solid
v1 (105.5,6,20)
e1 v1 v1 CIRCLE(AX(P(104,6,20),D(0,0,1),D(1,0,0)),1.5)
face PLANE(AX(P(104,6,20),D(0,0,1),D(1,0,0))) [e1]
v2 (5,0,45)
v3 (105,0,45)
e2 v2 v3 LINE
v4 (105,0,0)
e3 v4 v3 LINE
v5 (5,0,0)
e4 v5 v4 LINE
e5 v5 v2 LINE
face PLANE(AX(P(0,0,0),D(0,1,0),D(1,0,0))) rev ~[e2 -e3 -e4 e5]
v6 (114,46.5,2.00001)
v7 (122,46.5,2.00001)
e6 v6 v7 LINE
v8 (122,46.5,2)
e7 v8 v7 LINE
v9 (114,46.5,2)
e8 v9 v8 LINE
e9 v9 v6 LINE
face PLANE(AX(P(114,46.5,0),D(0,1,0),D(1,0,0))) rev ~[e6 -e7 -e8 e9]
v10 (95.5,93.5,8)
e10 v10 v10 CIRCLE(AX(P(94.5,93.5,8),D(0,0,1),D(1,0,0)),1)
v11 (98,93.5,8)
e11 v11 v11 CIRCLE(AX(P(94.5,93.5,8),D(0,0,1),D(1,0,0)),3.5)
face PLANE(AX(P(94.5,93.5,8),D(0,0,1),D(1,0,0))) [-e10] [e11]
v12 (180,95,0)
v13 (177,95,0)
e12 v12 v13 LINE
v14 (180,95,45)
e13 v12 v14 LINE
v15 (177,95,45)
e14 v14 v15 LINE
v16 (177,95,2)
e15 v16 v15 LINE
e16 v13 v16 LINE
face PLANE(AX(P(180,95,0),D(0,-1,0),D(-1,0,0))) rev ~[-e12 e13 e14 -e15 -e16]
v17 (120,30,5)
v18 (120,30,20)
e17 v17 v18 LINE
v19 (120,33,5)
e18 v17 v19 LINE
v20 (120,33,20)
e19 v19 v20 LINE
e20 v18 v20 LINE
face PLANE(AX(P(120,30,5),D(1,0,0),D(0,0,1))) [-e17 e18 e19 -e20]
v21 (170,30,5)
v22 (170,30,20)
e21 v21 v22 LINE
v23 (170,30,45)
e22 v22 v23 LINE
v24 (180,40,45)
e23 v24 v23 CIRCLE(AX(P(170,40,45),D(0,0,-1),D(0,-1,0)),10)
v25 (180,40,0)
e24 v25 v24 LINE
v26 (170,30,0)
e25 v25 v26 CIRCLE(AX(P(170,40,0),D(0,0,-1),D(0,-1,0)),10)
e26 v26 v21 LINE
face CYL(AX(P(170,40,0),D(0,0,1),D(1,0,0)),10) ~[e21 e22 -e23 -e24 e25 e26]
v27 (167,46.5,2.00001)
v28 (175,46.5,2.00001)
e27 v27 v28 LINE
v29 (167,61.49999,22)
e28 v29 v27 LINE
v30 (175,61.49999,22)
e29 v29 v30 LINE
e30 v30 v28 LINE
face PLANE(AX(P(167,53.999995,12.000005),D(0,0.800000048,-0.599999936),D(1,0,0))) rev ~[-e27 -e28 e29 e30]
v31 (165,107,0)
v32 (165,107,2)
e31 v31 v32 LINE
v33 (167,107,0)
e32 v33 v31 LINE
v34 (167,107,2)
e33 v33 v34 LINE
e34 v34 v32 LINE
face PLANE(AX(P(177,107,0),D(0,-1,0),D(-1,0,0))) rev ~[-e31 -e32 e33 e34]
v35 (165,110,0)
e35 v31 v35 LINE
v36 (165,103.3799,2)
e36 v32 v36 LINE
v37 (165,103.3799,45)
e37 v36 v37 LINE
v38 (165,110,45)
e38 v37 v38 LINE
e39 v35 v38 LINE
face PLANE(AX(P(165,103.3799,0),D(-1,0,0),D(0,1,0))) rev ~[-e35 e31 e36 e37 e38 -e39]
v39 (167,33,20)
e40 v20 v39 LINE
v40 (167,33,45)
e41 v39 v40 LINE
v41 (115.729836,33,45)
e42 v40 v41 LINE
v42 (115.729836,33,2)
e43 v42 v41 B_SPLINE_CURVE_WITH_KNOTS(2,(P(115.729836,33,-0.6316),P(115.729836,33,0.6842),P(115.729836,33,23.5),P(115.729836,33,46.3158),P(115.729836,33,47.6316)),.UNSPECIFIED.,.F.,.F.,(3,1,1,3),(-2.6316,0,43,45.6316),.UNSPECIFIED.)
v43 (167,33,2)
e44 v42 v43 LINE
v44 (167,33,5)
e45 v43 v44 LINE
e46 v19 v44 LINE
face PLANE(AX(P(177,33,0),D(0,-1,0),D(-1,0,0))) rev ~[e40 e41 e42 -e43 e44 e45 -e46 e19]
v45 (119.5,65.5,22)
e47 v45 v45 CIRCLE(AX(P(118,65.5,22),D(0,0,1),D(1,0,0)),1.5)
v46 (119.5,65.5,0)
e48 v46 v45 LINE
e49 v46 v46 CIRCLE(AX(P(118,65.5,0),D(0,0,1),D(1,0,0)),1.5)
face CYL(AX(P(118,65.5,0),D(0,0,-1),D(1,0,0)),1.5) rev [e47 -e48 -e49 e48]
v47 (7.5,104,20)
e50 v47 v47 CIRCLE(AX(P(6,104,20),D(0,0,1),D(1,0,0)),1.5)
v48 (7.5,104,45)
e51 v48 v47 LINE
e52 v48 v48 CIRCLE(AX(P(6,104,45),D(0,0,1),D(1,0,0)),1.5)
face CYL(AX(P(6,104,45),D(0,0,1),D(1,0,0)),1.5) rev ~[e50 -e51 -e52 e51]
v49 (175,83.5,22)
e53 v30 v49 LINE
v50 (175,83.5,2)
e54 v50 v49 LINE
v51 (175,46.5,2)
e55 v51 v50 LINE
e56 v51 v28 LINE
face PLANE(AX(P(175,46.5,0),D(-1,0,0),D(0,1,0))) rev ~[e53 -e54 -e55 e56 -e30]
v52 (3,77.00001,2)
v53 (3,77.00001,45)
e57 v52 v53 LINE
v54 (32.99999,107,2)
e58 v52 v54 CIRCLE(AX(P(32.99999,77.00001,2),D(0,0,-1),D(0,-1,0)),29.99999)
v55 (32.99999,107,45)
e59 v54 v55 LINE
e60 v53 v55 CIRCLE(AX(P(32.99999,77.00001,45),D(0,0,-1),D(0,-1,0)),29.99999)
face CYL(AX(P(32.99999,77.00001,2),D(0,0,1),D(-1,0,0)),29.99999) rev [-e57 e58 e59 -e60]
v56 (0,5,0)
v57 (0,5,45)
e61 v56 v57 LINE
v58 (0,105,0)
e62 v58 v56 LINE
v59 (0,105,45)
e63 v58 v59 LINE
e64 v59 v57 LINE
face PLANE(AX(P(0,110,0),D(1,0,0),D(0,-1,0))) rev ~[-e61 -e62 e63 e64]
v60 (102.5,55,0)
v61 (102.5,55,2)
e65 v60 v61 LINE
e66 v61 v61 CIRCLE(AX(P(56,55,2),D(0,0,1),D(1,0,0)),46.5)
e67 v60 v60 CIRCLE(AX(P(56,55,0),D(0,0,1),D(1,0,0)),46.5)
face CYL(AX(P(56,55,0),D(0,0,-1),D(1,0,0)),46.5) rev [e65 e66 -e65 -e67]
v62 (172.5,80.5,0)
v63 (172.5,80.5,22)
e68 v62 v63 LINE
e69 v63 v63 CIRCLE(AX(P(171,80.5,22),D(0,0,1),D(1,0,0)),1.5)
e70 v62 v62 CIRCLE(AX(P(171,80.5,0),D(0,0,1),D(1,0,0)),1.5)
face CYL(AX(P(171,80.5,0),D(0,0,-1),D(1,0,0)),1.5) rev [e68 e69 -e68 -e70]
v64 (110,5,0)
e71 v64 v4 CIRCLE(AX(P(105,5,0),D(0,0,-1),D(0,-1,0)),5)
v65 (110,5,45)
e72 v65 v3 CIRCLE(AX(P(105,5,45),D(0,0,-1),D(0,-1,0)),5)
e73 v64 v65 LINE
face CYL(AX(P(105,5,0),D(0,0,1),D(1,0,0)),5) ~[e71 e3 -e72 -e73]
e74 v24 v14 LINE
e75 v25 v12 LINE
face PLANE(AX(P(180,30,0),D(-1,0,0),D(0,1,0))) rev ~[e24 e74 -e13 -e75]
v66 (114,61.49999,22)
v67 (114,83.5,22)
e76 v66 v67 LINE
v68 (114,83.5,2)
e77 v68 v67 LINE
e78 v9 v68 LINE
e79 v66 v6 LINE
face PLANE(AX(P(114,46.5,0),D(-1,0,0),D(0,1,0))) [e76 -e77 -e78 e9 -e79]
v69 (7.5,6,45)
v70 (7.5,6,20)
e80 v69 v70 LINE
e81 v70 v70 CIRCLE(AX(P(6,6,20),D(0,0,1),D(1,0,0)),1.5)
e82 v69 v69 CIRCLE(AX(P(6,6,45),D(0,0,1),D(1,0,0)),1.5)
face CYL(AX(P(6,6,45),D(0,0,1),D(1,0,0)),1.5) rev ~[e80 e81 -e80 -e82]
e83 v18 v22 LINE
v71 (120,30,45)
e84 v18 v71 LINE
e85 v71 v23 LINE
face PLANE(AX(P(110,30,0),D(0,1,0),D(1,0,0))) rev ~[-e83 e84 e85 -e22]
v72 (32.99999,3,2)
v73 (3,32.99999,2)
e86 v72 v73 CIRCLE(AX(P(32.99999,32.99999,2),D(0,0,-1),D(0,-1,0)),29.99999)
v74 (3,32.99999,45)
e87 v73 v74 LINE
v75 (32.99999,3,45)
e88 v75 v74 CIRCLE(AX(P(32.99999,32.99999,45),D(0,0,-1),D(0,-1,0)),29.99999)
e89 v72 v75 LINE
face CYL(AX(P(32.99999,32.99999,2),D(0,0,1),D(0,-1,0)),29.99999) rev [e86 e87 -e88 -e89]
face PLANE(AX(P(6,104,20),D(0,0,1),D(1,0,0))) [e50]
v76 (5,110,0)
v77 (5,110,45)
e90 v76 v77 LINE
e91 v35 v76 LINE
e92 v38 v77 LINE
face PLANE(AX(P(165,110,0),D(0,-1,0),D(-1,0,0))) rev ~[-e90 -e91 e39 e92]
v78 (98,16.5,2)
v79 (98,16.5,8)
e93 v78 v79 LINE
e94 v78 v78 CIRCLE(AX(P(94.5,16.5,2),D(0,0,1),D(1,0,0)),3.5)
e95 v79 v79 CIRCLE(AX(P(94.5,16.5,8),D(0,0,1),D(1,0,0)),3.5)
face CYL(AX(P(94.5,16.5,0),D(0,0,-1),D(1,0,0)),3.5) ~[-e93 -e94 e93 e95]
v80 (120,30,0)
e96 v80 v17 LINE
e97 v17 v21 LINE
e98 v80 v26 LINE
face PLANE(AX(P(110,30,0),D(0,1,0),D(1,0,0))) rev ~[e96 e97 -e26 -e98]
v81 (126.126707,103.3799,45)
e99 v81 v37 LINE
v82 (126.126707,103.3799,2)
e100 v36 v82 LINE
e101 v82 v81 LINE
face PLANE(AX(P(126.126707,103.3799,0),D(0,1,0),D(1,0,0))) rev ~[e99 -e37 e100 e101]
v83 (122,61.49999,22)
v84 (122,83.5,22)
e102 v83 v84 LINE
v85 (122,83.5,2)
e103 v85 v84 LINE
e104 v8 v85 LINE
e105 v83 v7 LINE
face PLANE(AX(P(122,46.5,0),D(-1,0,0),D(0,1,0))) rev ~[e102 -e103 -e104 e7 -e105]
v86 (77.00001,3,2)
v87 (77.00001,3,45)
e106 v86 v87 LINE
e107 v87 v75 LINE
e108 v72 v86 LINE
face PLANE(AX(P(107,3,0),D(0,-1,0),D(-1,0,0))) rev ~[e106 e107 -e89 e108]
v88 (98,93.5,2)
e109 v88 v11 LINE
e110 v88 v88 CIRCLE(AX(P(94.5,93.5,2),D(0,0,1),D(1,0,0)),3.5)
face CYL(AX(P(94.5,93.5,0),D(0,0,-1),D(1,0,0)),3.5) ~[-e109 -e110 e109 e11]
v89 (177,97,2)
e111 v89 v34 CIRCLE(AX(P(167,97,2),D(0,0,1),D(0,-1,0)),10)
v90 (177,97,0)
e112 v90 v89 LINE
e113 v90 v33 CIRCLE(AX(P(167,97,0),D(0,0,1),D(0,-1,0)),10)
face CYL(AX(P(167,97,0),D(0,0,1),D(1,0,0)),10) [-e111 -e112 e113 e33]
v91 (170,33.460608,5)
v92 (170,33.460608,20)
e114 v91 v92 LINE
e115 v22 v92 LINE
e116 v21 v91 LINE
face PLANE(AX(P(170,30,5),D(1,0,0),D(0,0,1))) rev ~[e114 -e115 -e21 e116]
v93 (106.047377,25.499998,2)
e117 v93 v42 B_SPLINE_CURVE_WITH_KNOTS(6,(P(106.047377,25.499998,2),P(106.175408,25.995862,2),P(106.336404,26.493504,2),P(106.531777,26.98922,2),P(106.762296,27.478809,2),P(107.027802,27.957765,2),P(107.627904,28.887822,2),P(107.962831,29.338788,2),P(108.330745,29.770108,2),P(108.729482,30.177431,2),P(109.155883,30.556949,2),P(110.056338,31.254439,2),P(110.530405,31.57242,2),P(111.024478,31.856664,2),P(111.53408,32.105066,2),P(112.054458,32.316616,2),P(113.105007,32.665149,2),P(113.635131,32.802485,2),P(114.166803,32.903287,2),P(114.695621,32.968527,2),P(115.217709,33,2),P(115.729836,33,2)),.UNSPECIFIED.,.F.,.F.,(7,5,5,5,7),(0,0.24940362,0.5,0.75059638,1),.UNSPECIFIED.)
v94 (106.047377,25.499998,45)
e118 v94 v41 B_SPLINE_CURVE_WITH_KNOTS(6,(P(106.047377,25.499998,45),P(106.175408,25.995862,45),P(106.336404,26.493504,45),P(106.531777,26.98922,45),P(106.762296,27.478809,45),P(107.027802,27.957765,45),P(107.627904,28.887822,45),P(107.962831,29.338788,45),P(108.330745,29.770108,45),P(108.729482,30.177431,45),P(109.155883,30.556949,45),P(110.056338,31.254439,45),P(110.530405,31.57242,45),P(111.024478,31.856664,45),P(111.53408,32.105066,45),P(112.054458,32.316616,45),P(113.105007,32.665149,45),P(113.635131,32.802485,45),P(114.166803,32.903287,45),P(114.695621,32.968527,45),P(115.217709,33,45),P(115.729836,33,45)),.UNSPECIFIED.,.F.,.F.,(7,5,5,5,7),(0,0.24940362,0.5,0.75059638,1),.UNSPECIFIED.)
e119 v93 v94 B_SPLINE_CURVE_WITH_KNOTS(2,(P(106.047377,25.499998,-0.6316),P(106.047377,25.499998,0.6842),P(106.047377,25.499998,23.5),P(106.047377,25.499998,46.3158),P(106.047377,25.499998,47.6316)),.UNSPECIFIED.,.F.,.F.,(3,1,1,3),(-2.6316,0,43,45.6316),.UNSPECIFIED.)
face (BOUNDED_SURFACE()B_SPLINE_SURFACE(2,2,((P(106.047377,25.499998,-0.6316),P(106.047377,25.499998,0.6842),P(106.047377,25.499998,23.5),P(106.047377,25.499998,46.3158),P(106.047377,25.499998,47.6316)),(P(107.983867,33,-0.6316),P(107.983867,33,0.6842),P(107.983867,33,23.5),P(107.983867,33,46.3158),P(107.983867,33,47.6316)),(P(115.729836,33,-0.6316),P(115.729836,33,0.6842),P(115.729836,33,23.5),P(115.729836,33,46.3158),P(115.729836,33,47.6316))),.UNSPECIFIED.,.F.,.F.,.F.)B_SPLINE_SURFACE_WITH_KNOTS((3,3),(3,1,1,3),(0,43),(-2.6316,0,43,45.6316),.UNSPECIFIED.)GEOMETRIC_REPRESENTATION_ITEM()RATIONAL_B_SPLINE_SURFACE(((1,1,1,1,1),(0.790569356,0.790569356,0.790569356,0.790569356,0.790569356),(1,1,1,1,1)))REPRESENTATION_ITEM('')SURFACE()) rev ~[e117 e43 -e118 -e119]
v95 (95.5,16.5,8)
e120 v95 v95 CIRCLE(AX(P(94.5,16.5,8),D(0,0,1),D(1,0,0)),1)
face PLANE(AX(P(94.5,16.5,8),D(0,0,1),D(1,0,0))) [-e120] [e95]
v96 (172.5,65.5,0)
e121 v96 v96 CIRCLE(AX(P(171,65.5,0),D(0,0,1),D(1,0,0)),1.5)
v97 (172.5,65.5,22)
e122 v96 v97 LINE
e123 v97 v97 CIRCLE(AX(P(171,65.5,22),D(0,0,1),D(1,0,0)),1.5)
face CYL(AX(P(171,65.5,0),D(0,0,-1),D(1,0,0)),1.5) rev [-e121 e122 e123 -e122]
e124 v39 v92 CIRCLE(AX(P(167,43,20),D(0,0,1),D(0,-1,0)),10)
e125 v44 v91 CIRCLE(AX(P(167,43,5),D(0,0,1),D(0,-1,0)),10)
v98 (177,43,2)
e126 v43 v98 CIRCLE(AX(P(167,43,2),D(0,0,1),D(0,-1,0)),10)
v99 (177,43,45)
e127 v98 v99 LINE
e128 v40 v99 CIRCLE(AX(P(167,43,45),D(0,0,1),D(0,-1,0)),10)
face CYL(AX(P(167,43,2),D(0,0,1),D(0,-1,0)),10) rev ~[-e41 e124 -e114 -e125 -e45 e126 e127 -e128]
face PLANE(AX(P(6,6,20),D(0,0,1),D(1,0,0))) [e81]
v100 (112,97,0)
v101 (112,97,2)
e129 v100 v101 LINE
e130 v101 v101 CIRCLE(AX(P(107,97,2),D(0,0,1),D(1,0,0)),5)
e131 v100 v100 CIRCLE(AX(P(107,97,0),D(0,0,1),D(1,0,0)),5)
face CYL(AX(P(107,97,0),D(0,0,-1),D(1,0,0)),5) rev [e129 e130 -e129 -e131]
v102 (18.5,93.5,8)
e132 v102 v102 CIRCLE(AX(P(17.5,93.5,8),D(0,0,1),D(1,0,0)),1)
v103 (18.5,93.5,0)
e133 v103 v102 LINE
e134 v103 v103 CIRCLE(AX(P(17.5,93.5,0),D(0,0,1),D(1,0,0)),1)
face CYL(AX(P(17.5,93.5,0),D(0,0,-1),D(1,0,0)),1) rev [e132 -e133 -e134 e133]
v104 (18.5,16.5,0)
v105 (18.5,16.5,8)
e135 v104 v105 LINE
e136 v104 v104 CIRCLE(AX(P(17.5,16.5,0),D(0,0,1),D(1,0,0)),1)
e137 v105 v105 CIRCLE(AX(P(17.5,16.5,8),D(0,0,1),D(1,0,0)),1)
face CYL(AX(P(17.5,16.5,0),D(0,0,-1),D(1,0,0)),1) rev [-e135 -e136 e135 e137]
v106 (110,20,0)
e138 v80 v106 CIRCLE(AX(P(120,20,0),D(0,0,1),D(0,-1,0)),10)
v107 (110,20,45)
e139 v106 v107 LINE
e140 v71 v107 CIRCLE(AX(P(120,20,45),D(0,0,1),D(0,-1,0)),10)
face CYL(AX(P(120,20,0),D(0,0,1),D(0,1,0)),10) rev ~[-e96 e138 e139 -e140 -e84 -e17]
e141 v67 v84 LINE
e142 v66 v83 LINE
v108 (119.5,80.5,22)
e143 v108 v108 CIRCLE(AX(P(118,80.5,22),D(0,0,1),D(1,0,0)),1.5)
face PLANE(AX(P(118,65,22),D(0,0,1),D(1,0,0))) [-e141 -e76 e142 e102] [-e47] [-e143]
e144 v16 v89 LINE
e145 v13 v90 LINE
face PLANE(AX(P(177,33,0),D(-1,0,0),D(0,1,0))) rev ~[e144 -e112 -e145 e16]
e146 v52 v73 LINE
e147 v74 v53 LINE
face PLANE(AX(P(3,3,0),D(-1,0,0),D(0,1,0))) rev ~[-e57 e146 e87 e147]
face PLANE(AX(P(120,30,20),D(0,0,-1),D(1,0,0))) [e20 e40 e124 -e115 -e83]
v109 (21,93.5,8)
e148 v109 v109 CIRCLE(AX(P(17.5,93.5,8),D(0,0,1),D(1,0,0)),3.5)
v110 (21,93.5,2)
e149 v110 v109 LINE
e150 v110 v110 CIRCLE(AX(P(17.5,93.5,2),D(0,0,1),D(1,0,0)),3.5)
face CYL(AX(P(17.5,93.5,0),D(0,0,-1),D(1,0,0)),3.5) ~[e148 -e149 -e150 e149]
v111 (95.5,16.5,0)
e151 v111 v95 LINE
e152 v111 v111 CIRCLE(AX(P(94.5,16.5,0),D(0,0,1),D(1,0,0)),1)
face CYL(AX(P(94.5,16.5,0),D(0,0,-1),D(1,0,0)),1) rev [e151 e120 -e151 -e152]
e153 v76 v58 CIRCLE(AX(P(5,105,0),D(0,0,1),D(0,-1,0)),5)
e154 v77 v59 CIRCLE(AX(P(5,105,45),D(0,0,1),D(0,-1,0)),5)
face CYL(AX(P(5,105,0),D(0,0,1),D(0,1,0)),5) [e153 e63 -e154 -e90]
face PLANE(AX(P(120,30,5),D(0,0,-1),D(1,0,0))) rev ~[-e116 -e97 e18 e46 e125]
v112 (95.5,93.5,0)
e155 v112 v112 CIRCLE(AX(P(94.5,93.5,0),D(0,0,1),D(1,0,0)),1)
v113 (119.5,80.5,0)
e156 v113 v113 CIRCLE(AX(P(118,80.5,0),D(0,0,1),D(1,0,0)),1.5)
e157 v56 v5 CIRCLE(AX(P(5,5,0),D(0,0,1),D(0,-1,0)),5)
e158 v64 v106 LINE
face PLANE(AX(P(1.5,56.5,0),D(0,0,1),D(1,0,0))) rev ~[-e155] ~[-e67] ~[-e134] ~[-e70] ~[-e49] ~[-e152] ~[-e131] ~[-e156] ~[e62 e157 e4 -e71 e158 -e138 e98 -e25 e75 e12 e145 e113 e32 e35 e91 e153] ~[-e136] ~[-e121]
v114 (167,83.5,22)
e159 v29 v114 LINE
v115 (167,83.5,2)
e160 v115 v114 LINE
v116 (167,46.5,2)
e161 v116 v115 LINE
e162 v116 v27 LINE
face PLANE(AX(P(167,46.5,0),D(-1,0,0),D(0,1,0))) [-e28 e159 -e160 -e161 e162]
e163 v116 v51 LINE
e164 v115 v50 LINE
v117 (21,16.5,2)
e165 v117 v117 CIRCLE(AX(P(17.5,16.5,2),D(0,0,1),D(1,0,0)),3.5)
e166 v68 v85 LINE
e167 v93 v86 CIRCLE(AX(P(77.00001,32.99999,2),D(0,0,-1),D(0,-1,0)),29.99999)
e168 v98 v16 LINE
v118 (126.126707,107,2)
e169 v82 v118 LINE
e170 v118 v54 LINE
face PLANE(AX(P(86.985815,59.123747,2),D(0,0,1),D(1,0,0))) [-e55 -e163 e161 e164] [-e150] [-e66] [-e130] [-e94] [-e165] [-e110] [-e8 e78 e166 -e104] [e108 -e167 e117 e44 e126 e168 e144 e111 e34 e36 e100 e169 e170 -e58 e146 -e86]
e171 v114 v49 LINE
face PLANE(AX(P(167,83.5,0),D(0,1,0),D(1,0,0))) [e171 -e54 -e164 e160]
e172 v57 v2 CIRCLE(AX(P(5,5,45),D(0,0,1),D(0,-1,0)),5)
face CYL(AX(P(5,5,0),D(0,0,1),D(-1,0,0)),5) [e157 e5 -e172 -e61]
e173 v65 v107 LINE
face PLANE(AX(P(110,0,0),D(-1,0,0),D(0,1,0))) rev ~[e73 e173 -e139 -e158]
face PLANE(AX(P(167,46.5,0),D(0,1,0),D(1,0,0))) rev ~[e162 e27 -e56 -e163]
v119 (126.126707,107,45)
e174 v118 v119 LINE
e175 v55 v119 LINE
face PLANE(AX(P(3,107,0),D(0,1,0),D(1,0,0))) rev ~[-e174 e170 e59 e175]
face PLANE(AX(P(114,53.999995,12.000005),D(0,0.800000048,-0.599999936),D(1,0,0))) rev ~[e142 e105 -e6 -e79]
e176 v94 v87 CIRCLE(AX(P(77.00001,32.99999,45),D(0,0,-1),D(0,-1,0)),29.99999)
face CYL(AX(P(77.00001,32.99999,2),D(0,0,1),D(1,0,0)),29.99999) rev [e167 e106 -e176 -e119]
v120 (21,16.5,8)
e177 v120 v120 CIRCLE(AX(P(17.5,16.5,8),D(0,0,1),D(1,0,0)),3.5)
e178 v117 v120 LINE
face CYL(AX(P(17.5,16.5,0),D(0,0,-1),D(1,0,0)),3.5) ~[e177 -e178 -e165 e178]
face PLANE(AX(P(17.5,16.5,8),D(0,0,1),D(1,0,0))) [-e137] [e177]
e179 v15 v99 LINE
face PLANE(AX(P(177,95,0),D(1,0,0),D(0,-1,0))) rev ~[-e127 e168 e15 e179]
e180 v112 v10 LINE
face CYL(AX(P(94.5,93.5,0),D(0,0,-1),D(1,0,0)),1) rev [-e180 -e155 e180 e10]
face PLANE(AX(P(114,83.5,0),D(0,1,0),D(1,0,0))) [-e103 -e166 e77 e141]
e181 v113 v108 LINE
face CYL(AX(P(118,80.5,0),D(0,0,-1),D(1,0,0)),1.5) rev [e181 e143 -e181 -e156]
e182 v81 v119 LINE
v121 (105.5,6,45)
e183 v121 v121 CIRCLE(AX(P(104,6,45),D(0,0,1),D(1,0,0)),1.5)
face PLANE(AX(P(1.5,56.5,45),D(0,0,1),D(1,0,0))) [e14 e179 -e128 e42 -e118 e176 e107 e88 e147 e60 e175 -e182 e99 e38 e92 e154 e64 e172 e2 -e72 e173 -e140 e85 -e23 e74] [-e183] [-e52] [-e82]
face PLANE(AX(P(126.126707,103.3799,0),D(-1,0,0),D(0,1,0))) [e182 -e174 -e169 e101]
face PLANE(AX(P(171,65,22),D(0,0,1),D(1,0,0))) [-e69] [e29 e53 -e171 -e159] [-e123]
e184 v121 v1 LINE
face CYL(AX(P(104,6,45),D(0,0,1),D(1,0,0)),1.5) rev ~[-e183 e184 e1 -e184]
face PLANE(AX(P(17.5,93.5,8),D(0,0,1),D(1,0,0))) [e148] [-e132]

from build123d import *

# Parameters (mm, degrees)
F0_R        = 3.5
F0_R_2      = 46.5
F0_W        = 8
F0_H        = 37
F0_R_3      = 5
F1_DEPTH    = 2
F0_R_4      = 1.5
F2_DEPTH    = 22
F0_W_2      = 38.8732933998
F0_H_2      = 3.6201002002
F0_W_3      = 3
F0_H_3      = 27
F3_DEPTH    = 45
F4_R        = 29.99999
F5_R        = 10
F6_W        = 50
F6_H        = 15
F7_DEPTH    = 5
F8_R        = 5
F0_R_5      = 1
F9_DEPTH    = 8
F10_R       = 1.5
F11_DEPTH   = 25
F12_SIZE2   = 19.99999
F12_SIZE    = 14.99999
F12_2_SIZE2 = 19.99999
F12_2_SIZE  = 14.99999


# Not quite as in the source:
# - a fillet or chamfer is up to 0.001 mm smaller than in the source, because OpenCascade refuses the exact size


with BuildPart() as f1:
    # F0 (on Top) → F1 (new body)
    with BuildSketch(Plane.XY):
        Polygon((126.1267066002, 107), (3, 107), (3, 3), (107, 3), (107, 30), (107, 33), (177, 33), (177, 95), (177, 107), (165, 107), (165, 103.3798997998), (126.1267066002, 103.3798997998), align=None)
        with Locations((17.5, 16.5)):
            Circle(F0_R, mode=Mode.SUBTRACT)
        with Locations((94.5, 16.5)):
            Circle(F0_R, mode=Mode.SUBTRACT)
        with Locations((56, 55)):
            Circle(F0_R_2, mode=Mode.SUBTRACT)
        with Locations((17.5, 93.5)):
            Circle(F0_R, mode=Mode.SUBTRACT)
        with Locations((118, 65)):
            Rectangle(F0_W, F0_H, mode=Mode.SUBTRACT)
        with Locations((171, 65)):
            Rectangle(F0_W, F0_H, mode=Mode.SUBTRACT)
        with Locations((94.5, 93.5)):
            Circle(F0_R, mode=Mode.SUBTRACT)
        with Locations((107, 97)):
            Circle(F0_R_3, mode=Mode.SUBTRACT)
    extrude(amount=F1_DEPTH)

    # F0 (on Top) → F2 (join)
    with BuildSketch(Plane.XY):
        with Locations((118, 65)):
            Rectangle(F0_W, F0_H)
        with Locations((118, 65.5)):
            Circle(F0_R_4, mode=Mode.SUBTRACT)
        with Locations((118, 80.5)):
            Circle(F0_R_4, mode=Mode.SUBTRACT)
        with Locations((171, 65)):
            Rectangle(F0_W, F0_H)
        with Locations((171, 65.5)):
            Circle(F0_R_4, mode=Mode.SUBTRACT)
        with Locations((171, 80.5)):
            Circle(F0_R_4, mode=Mode.SUBTRACT)
    extrude(amount=F2_DEPTH)

    # F0 (on Top) → F3 (join)
    with BuildSketch(Plane.XY):
        Polygon((3, 110), (0, 110), (0, 3), (3, 3), (3, 107), align=None)
        Polygon((165, 110), (3, 110), (3, 107), (126.1267066002, 107), (165, 107), align=None)
        Polygon((3, 3), (0, 3), (0, 0), (110, 0), (110, 3), (107, 3), align=None)
        with Locations((145.5633533001, 105.1899498999)):
            Rectangle(F0_W_2, F0_H_2)
        with Locations((108.5, 16.5)):
            Rectangle(F0_W_3, F0_H_3)
        Polygon((107, 33), (107, 30), (110, 30), (177, 30), (177, 33), align=None)
        Polygon((180, 30), (180, 95), (177, 95), (177, 33), (177, 30), align=None)
    extrude(amount=F3_DEPTH)

    # F4 (radius 30 in the source; OpenCascade refuses exactly that, so slightly less here)
    f4_edges = [f1.edges().sort_by_distance(p)[0] for p in [
        (3, 107, 23.5),
        (3, 3, 23.5),
        (107, 3, 23.5),
    ]]
    fillet(f4_edges, radius=F4_R)

    # F5
    f5_edges = [f1.edges().sort_by_distance(p)[0] for p in [
        (177, 33, 23.5),
        (180, 30, 22.5),
        (110, 30, 22.5),
        (107, 33, 23.5),
        (177, 107, 1),
    ]]
    fillet(f5_edges, radius=F5_R)

    # F6 (on face) → F7 (cut)
    with BuildSketch(Plane.XZ.offset(-30)):
        with Locations((145, 12.5)):
            Rectangle(F6_W, F6_H)
    extrude(amount=-F7_DEPTH, mode=Mode.SUBTRACT)

    # F8
    f8_edges = [f1.edges().sort_by_distance(p)[0] for p in [
        (110, 0, 22.5),
        (0, 0, 22.5),
        (0, 110, 22.5),
    ]]
    fillet(f8_edges, radius=F8_R)

    # F0 (on Top) → F9 (join)
    with BuildSketch(Plane.XY):
        with Locations((94.5, 93.5)):
            Circle(F0_R)
        with Locations((94.5, 93.5)):
            Circle(F0_R_5, mode=Mode.SUBTRACT)
        with Locations((17.5, 93.5)):
            Circle(F0_R)
        with Locations((17.5, 93.5)):
            Circle(F0_R_5, mode=Mode.SUBTRACT)
        with Locations((17.5, 16.5)):
            Circle(F0_R)
        with Locations((17.5, 16.5)):
            Circle(F0_R_5, mode=Mode.SUBTRACT)
        with Locations((94.5, 16.5)):
            Circle(F0_R)
        with Locations((94.5, 16.5)):
            Circle(F0_R_5, mode=Mode.SUBTRACT)
    extrude(amount=F9_DEPTH)

    # F10 (on face) → F11 (cut)
    with BuildSketch(Plane.XY.offset(45)):
        with Locations((6, 104)):
            Circle(F10_R)
        with Locations((6, 6)):
            Circle(F10_R)
        with Locations((104, 6)):
            Circle(F10_R)
    extrude(amount=-F11_DEPTH, mode=Mode.SUBTRACT)

    # F12 (size 15 and 20 in the source; OpenCascade refuses exactly that, so slightly less here)
    f12_edges = [f1.edges().sort_by_distance(p)[0] for p in [
        (118, 46.5, 22),
    ]]
    f12_side = f1.faces().sort_by_distance((118, 83.12145, 22))[0]
    chamfer(f12_edges, length=F12_SIZE, length2=F12_SIZE2, reference=f12_side)

    # F12#2 (size 15 and 20 in the source; OpenCascade refuses exactly that, so slightly less here)
    f12_2_edges = [f1.edges().sort_by_distance(p)[0] for p in [
        (171, 46.5, 22),
    ]]
    f12_2_side = f1.faces().sort_by_distance((171, 83.12145, 22))[0]
    chamfer(f12_2_edges, length=F12_2_SIZE, length2=F12_2_SIZE2, reference=f12_2_side)


solid = f1.part
